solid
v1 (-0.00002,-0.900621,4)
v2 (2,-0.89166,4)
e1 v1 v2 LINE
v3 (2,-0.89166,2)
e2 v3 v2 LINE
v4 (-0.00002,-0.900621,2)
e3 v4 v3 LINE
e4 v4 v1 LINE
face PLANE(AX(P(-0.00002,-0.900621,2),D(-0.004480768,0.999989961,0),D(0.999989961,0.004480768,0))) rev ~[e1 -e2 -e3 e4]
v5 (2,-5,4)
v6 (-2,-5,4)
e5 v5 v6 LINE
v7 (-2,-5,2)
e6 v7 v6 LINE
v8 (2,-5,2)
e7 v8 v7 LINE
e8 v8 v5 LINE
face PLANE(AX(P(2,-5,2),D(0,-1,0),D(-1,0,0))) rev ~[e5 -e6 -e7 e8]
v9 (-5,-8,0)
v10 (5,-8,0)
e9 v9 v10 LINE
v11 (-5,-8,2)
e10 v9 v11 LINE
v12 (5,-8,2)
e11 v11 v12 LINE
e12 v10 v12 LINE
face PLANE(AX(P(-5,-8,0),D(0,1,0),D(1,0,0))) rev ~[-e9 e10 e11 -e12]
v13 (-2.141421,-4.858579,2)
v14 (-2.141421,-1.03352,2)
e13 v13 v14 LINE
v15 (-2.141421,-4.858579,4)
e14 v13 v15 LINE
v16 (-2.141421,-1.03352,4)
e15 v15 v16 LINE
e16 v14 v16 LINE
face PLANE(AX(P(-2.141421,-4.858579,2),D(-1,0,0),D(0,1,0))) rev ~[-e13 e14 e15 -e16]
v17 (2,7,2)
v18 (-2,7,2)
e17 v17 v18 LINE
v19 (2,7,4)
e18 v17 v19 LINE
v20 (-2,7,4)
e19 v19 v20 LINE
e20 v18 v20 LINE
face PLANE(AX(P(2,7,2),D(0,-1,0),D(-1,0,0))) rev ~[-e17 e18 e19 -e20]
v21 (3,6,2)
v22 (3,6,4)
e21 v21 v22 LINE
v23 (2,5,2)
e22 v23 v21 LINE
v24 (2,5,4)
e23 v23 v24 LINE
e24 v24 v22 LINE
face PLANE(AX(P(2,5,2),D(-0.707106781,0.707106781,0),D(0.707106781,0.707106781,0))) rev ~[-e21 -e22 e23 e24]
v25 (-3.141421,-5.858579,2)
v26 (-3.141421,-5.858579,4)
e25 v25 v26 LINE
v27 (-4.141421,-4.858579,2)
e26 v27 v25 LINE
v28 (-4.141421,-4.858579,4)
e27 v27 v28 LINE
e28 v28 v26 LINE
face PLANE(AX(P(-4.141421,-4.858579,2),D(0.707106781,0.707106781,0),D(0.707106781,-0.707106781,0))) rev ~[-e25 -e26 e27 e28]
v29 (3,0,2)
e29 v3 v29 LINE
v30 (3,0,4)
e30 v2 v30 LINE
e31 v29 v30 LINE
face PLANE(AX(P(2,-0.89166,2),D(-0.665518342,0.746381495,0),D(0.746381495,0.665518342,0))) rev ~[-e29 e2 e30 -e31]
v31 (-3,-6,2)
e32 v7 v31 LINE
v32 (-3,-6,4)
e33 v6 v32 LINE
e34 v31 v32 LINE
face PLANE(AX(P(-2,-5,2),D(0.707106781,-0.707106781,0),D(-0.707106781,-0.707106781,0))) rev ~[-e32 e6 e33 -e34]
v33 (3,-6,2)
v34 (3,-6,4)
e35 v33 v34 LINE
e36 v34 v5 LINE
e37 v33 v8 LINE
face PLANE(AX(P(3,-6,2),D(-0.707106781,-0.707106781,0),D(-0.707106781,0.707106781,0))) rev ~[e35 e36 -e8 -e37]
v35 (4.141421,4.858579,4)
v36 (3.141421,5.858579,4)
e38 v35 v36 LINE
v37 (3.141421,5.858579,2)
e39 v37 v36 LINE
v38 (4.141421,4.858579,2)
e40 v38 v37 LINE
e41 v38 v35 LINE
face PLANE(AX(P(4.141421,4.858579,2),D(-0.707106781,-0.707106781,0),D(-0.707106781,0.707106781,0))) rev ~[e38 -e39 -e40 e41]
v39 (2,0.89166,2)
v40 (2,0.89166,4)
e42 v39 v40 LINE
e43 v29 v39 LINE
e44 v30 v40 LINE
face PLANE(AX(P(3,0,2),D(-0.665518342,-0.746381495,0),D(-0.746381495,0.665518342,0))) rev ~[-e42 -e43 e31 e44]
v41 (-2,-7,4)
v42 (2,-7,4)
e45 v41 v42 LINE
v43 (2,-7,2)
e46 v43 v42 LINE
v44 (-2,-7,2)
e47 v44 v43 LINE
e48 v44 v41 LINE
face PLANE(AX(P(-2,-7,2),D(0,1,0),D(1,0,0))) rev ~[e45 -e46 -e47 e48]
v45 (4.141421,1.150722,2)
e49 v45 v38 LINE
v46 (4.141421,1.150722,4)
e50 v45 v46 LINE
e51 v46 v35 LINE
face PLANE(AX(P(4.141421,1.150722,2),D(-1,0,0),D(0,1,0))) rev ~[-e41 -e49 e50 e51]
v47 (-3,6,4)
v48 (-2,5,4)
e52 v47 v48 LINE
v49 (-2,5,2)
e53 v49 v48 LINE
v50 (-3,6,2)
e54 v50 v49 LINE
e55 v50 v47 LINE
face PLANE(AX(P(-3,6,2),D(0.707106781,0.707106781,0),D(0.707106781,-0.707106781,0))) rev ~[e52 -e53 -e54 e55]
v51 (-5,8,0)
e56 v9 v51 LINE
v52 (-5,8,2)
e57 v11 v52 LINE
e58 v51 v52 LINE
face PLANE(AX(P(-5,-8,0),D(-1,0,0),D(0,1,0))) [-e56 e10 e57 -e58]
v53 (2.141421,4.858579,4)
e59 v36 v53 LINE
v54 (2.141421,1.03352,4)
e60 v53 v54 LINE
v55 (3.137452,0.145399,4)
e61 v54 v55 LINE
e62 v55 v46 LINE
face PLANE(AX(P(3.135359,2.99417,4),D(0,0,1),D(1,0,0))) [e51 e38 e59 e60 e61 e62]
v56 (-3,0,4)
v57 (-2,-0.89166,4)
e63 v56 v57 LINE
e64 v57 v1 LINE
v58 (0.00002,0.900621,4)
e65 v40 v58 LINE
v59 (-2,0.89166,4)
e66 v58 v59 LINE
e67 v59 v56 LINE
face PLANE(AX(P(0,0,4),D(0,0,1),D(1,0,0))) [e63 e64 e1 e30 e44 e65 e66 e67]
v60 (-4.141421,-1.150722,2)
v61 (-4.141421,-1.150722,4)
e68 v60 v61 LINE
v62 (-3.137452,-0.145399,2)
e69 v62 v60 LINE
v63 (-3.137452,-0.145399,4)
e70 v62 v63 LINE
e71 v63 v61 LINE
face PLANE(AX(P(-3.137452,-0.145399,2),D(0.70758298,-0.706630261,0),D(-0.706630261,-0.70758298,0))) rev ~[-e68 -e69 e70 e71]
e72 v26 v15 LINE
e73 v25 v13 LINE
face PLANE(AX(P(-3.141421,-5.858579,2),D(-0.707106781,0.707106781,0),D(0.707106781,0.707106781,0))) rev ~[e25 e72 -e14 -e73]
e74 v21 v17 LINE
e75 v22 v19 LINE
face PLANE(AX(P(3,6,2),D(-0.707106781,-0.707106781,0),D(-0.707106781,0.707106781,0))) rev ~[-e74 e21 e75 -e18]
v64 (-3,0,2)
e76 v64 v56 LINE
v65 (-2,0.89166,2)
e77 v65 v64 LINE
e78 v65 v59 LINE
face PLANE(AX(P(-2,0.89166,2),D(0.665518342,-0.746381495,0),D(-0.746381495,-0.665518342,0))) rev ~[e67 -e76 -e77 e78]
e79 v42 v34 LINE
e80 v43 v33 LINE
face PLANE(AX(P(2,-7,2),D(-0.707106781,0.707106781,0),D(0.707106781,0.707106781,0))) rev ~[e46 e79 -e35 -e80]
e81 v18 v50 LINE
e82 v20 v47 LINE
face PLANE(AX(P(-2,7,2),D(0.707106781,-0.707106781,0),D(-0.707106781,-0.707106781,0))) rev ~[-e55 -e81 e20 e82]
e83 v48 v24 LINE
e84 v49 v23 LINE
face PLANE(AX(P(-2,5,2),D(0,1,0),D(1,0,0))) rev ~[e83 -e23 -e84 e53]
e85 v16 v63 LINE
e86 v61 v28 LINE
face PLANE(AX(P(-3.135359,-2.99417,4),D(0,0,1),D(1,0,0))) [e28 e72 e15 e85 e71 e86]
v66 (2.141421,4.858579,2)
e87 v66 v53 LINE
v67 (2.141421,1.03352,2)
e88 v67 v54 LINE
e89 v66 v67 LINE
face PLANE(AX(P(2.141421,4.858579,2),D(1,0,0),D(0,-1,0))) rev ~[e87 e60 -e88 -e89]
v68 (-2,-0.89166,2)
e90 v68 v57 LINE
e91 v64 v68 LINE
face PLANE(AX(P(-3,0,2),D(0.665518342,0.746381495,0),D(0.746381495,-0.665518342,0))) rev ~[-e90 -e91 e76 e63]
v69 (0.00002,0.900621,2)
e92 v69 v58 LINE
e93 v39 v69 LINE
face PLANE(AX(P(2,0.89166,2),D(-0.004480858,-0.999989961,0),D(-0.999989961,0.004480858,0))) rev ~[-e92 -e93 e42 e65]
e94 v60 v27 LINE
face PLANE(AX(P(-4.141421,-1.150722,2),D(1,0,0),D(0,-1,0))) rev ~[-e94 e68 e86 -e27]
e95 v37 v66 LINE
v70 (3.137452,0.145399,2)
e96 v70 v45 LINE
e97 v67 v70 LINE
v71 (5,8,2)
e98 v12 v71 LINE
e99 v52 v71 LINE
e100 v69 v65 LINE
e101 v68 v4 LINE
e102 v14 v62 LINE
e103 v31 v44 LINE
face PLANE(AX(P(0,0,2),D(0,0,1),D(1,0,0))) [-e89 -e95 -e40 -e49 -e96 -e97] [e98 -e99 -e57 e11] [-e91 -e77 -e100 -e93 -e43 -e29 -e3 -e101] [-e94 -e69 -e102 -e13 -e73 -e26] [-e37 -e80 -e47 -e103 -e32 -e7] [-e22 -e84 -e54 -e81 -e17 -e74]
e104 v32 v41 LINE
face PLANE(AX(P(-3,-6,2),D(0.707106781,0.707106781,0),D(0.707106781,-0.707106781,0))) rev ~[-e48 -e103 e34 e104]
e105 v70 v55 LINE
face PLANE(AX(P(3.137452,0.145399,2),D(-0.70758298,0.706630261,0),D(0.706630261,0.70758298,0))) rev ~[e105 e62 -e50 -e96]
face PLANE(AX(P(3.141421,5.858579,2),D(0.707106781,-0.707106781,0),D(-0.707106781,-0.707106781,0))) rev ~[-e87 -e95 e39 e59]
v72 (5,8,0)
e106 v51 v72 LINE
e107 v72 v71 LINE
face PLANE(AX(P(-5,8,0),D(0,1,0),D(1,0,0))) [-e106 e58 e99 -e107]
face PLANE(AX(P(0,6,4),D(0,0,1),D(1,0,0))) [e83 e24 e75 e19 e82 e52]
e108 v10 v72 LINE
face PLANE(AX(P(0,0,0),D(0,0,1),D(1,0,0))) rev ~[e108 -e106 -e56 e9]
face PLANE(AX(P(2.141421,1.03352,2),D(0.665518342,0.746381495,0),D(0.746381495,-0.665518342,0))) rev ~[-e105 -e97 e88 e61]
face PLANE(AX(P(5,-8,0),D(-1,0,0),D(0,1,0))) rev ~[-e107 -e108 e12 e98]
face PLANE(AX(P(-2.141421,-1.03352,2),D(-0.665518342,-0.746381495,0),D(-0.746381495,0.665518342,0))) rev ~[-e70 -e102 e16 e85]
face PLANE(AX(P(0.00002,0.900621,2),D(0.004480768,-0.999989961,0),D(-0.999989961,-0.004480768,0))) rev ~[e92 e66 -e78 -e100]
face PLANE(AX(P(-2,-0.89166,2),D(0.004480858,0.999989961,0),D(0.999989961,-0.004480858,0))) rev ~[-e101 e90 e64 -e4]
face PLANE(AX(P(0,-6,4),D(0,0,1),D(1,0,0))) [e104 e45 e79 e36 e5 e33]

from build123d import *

# Parameters (mm, degrees)
F0_W     = 10
F0_H     = 16
F1_DEPTH = 2
F3_DEPTH = 2


# Not quite as in the source:
# - ends of sketch curves that miss each other by under 0.0002 mm in the source are joined


with BuildPart() as f1:
    # F0 (on Top) → F1 (new body)
    with BuildSketch(Plane.XY):
        Rectangle(F0_W, F0_H)
    extrude(amount=F1_DEPTH)

    # F2 (on face) → F3 (join)
    with BuildSketch(Plane.XY.offset(2)):
        Polygon((0, 7), (-2, 7), (-3, 6), (-2, 5), (0, 5), (2, 5), (3, 6), (2, 7), align=None)
        Polygon((2, 0.891659756), (2.00782e-05, 0.9006214721), (-2, 0.891659756), (-3, 0), (-2, -0.891659756), (-2.00782e-05, -0.9006214721), (2, -0.891659756), (3, 0), align=None)
        Polygon((0, -5), (-2, -5), (-3, -6), (-2, -7), (0, -7), (2, -7), (3, -6), (2, -5), align=None)
        Polygon((-4.1414213562, -4.8585786438), (-3.1414213562, -5.8585786438), (-2.1414213562, -4.8585786438), (-2.1414213562, -1.0335195075), (-3.1374518146, -0.1453992321), (-4.1414213562, -1.1507223826), align=None)
        Polygon((4.1414213562, 4.8585786438), (3.1414213562, 5.8585786438), (2.1414213562, 4.8585786438), (2.1414213562, 1.0335195075), (3.1374518146, 0.1453992321), (4.1414213562, 1.1507223826), align=None)
    extrude(amount=F3_DEPTH)


solid = f1.part
